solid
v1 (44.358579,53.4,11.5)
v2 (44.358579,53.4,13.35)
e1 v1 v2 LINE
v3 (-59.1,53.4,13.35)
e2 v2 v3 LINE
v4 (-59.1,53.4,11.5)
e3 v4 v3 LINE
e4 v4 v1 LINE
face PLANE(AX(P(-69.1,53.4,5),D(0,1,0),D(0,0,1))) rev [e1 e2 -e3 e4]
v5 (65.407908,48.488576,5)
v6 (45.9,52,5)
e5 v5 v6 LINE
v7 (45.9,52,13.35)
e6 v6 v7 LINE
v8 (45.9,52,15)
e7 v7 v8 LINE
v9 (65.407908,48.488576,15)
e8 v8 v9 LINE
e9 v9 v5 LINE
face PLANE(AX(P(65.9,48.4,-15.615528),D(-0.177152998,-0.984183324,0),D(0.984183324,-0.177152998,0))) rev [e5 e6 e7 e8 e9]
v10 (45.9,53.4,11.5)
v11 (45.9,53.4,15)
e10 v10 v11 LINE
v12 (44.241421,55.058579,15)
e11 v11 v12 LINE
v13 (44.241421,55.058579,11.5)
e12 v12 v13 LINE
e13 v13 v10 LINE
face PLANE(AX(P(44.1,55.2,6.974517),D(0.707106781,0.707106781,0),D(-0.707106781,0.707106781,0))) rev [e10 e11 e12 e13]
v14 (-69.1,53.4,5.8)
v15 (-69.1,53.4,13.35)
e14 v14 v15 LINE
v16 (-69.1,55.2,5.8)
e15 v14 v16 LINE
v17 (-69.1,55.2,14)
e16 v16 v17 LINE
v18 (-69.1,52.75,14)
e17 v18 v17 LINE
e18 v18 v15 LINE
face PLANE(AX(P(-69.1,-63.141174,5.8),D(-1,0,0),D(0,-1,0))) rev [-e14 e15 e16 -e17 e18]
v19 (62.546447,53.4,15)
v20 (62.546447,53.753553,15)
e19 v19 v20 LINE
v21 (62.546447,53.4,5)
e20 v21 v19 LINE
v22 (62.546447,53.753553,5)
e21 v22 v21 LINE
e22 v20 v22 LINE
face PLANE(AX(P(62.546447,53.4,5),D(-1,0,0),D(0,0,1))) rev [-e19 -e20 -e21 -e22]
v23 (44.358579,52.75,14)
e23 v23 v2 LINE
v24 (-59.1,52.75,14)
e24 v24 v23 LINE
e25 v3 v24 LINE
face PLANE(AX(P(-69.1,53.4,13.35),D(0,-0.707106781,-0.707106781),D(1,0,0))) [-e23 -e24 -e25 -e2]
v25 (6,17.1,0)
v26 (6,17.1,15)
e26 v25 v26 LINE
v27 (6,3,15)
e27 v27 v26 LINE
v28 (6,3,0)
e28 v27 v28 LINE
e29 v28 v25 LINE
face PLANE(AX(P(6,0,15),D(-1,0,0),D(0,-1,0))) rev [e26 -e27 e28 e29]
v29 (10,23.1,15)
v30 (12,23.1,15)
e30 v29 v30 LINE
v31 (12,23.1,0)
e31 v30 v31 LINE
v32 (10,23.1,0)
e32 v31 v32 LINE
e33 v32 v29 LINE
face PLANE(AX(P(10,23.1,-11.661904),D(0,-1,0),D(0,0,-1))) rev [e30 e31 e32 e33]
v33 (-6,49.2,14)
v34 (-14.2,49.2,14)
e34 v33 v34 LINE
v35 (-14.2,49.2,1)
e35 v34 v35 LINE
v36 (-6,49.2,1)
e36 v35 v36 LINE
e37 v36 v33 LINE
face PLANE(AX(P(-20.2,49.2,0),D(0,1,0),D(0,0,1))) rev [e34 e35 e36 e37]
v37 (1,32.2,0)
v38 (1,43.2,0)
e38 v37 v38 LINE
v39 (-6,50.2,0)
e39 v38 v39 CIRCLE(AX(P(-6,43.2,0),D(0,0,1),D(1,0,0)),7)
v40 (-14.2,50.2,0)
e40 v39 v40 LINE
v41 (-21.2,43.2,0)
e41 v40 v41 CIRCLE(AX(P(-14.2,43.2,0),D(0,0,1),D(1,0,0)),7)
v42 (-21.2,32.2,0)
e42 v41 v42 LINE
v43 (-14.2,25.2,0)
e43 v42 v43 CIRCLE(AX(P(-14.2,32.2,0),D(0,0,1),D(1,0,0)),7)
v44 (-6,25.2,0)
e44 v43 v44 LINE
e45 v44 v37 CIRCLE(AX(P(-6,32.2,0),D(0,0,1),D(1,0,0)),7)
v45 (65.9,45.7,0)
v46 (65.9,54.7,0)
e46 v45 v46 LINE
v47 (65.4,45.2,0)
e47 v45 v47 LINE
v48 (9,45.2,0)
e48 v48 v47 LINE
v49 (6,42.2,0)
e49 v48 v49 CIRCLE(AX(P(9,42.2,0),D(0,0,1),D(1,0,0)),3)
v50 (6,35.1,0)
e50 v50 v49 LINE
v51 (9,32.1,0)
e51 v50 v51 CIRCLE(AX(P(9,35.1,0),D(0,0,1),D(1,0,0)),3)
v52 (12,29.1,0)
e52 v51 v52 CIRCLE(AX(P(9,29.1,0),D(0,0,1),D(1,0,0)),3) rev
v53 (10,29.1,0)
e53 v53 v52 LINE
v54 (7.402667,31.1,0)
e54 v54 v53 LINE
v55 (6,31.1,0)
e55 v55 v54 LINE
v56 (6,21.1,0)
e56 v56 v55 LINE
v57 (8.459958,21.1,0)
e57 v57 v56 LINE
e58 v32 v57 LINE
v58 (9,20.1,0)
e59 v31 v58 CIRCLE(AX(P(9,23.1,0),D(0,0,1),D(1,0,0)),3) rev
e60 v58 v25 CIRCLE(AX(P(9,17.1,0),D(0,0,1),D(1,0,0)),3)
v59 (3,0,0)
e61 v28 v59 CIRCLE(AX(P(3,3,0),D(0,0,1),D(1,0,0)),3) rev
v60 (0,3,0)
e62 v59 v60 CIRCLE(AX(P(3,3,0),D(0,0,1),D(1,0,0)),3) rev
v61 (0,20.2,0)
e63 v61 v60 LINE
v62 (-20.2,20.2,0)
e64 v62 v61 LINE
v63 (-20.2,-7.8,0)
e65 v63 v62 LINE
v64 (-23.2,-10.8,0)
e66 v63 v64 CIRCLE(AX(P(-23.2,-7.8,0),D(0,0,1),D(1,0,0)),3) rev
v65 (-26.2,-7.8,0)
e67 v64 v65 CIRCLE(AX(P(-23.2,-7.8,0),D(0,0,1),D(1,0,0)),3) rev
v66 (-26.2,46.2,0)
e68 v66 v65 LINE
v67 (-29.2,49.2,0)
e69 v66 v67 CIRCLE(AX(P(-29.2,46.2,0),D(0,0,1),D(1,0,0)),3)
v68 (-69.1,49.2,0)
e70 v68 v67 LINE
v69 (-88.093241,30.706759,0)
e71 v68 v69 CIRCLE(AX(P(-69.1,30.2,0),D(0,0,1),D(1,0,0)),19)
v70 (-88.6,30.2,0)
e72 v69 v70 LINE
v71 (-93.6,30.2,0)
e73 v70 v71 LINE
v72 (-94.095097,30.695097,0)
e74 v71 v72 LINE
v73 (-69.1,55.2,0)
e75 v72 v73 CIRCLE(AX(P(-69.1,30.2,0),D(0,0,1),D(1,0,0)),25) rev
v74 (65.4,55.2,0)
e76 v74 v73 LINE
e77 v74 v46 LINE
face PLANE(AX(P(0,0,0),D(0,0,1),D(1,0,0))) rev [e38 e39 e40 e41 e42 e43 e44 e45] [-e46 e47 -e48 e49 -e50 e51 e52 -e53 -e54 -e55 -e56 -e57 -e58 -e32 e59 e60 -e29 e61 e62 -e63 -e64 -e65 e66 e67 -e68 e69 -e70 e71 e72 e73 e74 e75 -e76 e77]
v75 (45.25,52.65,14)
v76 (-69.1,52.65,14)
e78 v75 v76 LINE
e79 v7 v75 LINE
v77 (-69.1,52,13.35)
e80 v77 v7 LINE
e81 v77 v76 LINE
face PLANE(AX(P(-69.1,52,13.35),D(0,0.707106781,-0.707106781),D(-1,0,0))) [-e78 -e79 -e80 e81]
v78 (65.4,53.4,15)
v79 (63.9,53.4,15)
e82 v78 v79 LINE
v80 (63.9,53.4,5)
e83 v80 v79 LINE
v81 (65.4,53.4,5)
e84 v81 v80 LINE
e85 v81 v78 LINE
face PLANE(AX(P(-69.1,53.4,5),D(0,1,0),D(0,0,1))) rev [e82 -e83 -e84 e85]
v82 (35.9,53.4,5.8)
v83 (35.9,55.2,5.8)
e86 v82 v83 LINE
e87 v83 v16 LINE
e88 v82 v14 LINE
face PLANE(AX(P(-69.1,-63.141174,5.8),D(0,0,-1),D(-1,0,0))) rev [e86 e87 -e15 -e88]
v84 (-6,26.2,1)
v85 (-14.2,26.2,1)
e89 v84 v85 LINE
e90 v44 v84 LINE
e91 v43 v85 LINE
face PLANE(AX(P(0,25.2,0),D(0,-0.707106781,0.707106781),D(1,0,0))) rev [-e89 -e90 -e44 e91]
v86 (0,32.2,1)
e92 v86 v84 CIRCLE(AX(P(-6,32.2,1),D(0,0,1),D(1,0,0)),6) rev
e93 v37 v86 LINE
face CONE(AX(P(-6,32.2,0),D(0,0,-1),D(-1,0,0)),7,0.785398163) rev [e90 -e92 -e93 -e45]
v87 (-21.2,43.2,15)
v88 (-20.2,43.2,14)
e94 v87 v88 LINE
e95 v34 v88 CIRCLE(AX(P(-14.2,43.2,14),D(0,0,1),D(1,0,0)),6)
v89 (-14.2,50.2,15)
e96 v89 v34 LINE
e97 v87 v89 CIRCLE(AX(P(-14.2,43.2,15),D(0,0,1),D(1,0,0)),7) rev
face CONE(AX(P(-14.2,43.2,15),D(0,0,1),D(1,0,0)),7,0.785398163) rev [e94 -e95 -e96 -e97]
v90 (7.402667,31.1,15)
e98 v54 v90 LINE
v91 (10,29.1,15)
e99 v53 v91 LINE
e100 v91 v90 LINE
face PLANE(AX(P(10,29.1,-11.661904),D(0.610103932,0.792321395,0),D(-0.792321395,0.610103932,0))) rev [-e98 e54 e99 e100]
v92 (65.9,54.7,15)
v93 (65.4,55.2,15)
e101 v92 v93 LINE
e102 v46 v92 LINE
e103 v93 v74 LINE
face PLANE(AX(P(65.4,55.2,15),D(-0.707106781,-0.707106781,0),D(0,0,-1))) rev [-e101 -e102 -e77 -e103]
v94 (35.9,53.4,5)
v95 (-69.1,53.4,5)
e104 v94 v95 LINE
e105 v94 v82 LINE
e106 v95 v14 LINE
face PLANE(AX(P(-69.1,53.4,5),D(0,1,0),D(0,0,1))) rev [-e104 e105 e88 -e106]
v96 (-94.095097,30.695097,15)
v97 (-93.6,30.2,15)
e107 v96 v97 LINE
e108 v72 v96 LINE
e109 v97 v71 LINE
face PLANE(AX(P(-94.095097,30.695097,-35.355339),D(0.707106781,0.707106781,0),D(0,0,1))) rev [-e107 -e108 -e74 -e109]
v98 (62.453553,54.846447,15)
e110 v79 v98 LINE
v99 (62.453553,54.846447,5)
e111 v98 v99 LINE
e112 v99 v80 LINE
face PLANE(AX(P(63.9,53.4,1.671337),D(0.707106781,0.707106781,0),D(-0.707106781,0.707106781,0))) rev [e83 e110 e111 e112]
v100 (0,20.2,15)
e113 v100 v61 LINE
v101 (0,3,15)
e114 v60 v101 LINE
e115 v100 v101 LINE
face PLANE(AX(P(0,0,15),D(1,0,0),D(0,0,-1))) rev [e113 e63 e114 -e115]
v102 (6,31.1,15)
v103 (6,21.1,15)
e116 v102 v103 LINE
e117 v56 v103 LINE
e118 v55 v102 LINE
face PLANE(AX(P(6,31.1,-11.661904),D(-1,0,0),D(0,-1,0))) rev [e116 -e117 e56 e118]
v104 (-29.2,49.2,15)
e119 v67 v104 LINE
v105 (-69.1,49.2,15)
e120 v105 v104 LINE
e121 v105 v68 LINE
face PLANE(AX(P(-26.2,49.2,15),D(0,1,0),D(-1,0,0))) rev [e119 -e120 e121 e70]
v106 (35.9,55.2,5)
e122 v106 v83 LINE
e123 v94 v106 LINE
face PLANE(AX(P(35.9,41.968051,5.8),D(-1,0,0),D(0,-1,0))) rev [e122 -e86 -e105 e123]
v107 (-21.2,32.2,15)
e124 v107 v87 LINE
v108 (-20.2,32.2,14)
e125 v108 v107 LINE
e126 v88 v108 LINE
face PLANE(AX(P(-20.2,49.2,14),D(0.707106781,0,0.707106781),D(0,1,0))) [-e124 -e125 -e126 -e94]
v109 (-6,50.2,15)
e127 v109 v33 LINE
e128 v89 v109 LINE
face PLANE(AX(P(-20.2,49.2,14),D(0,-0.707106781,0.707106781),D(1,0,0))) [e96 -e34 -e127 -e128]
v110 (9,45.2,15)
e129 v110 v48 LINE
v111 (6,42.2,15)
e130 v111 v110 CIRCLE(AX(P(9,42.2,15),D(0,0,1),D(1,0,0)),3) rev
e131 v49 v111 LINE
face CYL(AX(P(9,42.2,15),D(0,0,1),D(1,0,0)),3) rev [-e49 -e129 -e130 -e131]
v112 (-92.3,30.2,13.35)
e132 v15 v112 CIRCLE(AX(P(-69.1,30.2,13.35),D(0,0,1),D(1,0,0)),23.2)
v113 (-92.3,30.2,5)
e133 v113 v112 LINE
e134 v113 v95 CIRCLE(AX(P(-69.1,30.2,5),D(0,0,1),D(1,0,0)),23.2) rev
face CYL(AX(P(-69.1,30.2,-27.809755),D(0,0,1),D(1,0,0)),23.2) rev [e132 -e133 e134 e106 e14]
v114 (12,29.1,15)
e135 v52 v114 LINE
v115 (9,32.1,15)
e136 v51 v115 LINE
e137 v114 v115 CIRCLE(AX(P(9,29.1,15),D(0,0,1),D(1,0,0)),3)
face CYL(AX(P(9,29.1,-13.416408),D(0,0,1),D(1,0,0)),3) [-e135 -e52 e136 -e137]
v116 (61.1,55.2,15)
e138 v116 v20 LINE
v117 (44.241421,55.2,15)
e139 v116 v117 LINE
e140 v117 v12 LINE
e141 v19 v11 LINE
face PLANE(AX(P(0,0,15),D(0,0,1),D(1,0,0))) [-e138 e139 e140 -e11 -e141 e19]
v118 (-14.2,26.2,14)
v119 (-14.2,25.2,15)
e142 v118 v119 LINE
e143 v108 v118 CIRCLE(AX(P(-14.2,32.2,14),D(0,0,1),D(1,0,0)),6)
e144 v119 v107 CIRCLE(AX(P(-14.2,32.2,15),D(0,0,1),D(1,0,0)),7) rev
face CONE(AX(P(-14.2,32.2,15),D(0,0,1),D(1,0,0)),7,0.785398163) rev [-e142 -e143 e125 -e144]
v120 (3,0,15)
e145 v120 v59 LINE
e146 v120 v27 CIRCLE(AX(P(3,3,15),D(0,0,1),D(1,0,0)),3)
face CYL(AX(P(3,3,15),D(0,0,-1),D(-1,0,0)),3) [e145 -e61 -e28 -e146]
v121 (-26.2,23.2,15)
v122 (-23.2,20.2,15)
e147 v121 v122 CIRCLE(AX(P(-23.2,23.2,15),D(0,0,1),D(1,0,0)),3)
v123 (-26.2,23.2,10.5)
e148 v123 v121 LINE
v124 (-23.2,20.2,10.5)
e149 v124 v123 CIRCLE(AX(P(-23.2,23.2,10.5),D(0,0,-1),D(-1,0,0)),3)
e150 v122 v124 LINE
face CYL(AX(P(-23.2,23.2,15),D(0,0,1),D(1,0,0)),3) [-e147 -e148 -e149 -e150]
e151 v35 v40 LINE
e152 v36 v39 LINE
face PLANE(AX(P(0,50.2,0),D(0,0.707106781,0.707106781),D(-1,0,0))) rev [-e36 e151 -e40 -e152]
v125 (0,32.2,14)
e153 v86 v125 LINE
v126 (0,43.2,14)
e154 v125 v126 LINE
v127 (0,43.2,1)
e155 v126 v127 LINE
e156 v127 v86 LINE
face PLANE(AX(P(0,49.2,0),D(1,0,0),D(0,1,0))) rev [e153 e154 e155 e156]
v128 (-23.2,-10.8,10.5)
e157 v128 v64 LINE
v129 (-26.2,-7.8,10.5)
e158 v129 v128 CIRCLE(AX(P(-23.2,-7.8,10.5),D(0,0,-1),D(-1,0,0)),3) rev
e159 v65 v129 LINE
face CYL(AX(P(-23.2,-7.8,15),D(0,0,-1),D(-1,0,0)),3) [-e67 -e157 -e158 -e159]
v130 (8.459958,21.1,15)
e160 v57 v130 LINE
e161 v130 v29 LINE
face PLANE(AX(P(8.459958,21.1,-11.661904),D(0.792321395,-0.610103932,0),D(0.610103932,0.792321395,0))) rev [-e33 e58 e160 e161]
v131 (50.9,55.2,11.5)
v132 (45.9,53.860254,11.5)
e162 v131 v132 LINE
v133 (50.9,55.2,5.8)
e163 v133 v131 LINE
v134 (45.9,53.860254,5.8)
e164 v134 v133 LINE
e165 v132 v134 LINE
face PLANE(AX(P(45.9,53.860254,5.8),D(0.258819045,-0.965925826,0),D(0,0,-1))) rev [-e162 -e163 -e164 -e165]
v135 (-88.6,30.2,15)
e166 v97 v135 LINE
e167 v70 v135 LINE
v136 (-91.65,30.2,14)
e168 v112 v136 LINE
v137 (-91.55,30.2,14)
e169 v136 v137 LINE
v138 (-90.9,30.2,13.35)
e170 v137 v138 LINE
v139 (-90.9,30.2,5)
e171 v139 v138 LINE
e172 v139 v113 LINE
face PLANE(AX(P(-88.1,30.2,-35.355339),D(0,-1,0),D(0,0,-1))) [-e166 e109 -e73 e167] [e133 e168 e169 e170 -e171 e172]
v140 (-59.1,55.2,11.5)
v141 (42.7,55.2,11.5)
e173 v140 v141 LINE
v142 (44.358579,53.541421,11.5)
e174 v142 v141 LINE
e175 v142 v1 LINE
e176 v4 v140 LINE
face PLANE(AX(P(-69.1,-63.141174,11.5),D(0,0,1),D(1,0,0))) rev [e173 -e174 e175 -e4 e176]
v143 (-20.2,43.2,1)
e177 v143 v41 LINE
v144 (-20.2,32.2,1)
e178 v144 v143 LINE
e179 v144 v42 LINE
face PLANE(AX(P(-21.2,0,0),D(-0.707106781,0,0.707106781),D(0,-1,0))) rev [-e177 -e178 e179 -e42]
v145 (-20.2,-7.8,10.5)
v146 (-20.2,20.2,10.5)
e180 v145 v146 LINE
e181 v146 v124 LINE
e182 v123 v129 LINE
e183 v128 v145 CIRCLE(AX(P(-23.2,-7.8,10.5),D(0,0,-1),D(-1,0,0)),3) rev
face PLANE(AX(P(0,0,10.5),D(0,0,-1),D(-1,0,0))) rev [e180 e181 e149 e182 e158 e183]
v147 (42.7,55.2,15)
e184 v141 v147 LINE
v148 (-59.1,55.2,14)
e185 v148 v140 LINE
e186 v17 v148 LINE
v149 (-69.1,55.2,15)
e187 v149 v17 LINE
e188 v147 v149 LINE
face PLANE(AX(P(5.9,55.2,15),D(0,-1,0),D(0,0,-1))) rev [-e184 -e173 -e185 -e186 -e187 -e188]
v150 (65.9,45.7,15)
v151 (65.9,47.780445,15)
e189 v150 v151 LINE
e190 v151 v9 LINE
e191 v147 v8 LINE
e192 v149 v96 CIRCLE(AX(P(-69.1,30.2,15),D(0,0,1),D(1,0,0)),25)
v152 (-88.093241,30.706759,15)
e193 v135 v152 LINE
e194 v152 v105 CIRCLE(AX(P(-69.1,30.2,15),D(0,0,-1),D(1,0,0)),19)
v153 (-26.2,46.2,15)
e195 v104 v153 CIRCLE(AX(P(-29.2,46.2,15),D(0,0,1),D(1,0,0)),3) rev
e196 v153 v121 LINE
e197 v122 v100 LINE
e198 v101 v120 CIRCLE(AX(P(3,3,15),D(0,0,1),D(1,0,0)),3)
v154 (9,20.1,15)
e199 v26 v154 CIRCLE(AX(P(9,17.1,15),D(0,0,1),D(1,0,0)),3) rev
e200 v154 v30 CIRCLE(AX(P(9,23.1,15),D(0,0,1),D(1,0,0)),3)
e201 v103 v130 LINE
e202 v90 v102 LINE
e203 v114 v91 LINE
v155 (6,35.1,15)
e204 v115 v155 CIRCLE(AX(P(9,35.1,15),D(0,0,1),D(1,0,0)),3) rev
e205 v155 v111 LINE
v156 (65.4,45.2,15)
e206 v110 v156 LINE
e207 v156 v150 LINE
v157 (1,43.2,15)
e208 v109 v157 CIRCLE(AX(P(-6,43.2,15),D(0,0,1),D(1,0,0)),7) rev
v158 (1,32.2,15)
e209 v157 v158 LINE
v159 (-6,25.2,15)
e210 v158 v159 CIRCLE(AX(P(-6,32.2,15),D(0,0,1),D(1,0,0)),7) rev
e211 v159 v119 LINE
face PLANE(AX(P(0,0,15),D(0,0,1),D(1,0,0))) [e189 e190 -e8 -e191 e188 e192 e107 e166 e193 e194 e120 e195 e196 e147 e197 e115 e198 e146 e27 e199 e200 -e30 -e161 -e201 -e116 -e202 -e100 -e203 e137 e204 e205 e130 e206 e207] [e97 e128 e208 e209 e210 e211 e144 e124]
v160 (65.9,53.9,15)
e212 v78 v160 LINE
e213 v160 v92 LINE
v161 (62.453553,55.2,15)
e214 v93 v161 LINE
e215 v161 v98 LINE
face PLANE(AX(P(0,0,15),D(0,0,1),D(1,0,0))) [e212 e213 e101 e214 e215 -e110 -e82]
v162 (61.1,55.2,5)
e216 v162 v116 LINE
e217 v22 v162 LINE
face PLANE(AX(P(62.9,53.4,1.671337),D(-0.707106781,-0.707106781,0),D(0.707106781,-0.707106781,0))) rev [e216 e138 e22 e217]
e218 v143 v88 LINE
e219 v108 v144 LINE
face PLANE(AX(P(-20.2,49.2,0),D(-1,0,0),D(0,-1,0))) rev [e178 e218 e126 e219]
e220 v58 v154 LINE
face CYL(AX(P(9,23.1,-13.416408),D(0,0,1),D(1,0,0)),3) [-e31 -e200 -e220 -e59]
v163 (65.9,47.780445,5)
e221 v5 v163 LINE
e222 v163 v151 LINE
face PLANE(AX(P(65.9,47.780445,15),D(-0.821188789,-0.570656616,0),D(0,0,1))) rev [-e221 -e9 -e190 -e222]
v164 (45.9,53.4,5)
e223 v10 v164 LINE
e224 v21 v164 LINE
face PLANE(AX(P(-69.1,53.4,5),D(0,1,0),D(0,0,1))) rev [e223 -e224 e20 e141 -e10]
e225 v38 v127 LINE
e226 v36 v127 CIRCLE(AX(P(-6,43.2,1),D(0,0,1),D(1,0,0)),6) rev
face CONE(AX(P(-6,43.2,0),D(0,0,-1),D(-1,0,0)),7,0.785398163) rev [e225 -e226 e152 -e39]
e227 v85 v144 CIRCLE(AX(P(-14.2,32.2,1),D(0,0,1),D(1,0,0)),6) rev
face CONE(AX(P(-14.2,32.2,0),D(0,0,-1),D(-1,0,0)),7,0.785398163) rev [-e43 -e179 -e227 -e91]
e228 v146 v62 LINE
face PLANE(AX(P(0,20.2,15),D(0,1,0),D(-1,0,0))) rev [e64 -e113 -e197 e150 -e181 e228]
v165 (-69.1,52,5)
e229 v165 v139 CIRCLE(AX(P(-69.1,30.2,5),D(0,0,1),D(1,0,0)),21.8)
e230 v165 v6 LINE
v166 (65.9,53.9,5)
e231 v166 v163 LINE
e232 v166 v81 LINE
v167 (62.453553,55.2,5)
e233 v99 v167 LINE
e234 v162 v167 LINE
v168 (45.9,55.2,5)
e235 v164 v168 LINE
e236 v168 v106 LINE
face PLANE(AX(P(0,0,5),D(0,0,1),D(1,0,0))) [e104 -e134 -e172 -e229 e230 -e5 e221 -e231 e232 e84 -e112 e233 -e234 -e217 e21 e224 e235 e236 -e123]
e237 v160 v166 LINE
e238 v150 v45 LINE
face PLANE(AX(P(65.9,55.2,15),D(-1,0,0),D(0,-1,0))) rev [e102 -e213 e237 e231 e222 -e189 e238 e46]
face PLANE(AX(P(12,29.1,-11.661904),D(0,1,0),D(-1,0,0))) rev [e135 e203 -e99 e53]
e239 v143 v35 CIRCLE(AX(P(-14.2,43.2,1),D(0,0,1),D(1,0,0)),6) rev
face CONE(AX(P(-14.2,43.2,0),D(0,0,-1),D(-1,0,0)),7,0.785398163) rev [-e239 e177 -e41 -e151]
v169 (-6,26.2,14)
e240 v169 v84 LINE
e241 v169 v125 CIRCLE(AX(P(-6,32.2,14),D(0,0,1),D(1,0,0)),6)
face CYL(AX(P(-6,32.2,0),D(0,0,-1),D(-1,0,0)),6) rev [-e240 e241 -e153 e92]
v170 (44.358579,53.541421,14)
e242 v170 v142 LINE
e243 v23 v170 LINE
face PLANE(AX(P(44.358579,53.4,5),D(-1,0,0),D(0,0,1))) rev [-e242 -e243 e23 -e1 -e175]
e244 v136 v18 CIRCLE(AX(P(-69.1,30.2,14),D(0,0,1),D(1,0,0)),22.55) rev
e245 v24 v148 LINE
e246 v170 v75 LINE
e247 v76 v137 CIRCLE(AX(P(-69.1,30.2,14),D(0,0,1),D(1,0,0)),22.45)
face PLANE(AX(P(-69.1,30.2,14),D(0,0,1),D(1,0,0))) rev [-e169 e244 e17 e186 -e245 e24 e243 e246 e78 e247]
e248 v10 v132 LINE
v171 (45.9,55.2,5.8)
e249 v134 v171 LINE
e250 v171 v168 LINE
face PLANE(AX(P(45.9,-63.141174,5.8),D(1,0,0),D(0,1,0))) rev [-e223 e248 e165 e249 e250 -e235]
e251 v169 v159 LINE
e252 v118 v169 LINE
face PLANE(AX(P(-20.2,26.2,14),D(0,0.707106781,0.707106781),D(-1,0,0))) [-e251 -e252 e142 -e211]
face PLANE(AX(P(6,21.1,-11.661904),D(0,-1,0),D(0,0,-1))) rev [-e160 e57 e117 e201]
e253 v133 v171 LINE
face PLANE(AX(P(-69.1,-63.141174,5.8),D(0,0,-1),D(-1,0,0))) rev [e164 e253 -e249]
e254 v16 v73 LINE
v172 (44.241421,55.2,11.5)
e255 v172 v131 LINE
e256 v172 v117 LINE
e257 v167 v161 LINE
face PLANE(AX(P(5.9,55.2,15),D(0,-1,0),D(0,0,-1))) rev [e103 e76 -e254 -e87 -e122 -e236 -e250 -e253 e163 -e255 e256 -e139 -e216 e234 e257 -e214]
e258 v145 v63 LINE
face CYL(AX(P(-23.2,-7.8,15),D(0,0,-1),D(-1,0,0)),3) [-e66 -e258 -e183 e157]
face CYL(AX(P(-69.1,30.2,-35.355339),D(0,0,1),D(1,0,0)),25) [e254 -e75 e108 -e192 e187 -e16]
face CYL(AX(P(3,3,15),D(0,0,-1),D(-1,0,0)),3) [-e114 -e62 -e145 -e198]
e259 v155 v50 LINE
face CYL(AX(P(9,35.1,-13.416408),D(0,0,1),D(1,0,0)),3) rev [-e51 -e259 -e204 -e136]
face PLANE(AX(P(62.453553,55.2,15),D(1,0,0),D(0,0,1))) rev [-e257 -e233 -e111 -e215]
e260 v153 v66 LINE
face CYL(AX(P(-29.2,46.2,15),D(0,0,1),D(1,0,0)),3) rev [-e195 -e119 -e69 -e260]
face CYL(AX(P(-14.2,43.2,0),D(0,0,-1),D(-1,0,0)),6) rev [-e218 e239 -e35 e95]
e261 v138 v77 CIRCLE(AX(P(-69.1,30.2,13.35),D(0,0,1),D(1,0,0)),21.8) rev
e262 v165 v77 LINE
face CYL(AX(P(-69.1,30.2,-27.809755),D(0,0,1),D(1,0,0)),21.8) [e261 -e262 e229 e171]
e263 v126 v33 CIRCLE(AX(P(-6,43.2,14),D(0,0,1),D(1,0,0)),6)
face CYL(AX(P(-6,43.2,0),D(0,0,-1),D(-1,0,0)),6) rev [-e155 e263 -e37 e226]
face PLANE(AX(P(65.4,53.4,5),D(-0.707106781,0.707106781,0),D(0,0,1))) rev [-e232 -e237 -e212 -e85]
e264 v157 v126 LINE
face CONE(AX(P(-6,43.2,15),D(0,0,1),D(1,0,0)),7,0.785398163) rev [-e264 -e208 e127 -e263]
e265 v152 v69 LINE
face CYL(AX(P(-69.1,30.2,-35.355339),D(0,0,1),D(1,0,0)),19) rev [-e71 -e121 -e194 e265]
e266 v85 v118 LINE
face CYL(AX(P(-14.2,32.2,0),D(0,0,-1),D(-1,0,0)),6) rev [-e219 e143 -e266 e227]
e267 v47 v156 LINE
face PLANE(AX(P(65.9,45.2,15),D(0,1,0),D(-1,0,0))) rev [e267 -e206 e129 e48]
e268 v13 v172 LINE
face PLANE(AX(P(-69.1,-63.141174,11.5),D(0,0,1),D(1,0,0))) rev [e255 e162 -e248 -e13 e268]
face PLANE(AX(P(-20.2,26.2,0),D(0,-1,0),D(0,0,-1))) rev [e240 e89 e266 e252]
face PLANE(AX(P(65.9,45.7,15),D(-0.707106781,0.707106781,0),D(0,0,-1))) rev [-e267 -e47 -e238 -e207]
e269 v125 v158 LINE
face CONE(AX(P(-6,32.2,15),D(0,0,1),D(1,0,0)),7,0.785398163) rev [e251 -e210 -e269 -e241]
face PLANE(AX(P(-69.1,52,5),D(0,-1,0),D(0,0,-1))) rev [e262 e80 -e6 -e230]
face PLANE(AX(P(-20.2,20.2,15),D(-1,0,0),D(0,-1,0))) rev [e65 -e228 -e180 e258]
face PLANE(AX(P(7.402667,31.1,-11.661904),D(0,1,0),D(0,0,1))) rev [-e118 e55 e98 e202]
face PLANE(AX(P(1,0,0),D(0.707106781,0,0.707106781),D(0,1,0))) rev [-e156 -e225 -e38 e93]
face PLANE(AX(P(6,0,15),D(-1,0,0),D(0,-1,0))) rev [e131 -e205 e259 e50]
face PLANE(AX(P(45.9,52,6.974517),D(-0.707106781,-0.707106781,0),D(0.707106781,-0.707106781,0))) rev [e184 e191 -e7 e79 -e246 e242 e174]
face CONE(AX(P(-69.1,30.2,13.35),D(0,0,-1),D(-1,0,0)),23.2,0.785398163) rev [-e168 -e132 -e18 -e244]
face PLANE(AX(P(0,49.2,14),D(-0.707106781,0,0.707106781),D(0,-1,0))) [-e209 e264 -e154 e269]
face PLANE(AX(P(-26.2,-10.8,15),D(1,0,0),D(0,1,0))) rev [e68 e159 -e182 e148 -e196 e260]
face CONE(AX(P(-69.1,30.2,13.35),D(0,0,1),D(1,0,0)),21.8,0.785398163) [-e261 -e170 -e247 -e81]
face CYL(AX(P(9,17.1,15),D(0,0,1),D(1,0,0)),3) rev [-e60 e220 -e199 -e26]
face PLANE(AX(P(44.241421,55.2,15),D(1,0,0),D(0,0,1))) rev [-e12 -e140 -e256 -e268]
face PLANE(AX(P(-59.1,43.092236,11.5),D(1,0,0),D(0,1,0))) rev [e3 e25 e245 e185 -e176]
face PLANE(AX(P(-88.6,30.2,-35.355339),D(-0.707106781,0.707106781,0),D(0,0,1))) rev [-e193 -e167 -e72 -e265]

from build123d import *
from OCP.BRepFilletAPI import BRepFilletAPI_MakeChamfer

# Parameters (mm, degrees)
BOSS_EXTRUDE1_DEPTH = 15
BOSS_EXTRUDE2_DEPTH = 15
SKETCH6_W           = 115
SKETCH6_H           = 1.4
CUT_EXTRUDE2_DEPTH  = 10
CUT_EXTRUDE3_DEPTH  = 10
CUT_EXTRUDE4_DEPTH  = 10
BOSS_EXTRUDE3_DEPTH = 1
CUT_EXTRUDE5_REACH  = 117.913
SKETCH10_W          = 115
SKETCH10_H          = 5.7
SKETCH13_W          = 20.2
SKETCH13_H          = 23
CUT_EXTRUDE6_DEPTH  = 111.121977825
FILLET1_R           = 6
SKETCH14_W          = 6
SKETCH14_H          = 31
CUT_EXTRUDE7_DEPTH  = 4.5
FILLET2_R           = 3
SKETCH16_W          = 10
SKETCH16_H          = 2.5
CUT_EXTRUDE8_DEPTH  = 1.8
CHAMFER1_SIZE       = 0.5
CHAMFER1_SIZE_2     = 0.619555405
CHAMFER2_SIZE       = 1
CHAMFER3_SIZE       = 5
CHAMFER3_SIZE2      = 1.339745962
CUT_EXTRUDE12_REACH = 112.118
CHAMFER4_SIZE       = 0.2
CHAMFER4_SIZE_2     = 0.141421356
SKETCH25_W          = 6
SKETCH25_H          = 12
BOSS_EXTRUDE6_DEPTH = 15
FILLET4_START       = -1
FILLET4_DEPTH       = 16
FILLET4_2_DEPTH     = 15
CUT_EXTRUDE15_DEPTH = 15
CUT_EXTRUDE16_DEPTH = 10
CHAMFER5_SIZE       = 0.5
CHAMFER5_SIZE2      = 0.353553391
CHAMFER6_SIZE       = 0.65
SKETCH29_W          = 10
SKETCH29_H          = 0.8
CUT_EXTRUDE17_DEPTH = 3.2


with BuildPart() as part:
    # Sketch3 → Boss-Extrude1 (new body)
    with BuildSketch(Plane.XY):
        Polygon((0, 0), (0, 20.2), (-20.2, 20.2), (-20.2, -10.8), (-26.2, -10.8), (-26.2, 49.2), (-69.1, 49.2), (-69.1, 55.2), (5.9, 55.2), (65.9, 55.2), (65.9, 45.2), (6, 45.2), (6, 0), align=None)
    extrude(amount=BOSS_EXTRUDE1_DEPTH)

    # Sketch4 → Boss-Extrude2 (add)
    with BuildSketch(Plane.XY.offset(15)):
        with BuildLine():
            Line((-88.1, 30.2), (-94.1, 30.2))
            ThreePointArc((-94.1, 30.2), (-86.77766953, 47.87766953), (-69.1, 55.2))
            Line((-69.1, 55.2), (-69.1, 49.2))
            ThreePointArc((-69.1, 49.2), (-82.535028843, 43.635028843), (-88.1, 30.2))
        make_face()
    extrude(amount=-BOSS_EXTRUDE2_DEPTH)

    # Sketch6 → Cut-Extrude2 (cut)
    with BuildSketch(Plane.XY.offset(15)):
        with Locations((-11.6, 52.7)):
            Rectangle(SKETCH6_W, SKETCH6_H)
    extrude(amount=-CUT_EXTRUDE2_DEPTH, mode=Mode.SUBTRACT)

    # Sketch7 → Cut-Extrude3 (cut)
    with BuildSketch(Plane.XY.offset(15)):
        with BuildLine():
            Line((-92.3, 30.2), (-90.9, 30.2))
            ThreePointArc((-90.9, 30.2), (-84.51492783, 45.61492783), (-69.1, 52))
            Line((-69.1, 52), (-69.1, 53.4))
            ThreePointArc((-69.1, 53.4), (-85.504877324, 46.604877324), (-92.3, 30.2))
        make_face()
    extrude(amount=-CUT_EXTRUDE3_DEPTH, mode=Mode.SUBTRACT)

    # Sketch8 → Cut-Extrude4 (cut)
    with BuildSketch(Plane.XY.offset(15)):
        Polygon((45.9, 53.4), (65.9, 53.4), (65.9, 48.4), (45.9, 52), align=None)
    extrude(amount=-CUT_EXTRUDE4_DEPTH, mode=Mode.SUBTRACT)

    # Sketch9 → Boss-Extrude3 (add)
    with BuildSketch(Plane.XY.offset(15)):
        with BuildLine():
            Line((-69.1, 52), (45.9, 52))
            Line((45.9, 52), (45.9, 53.4))
            Line((45.9, 53.4), (-69.1, 53.4))
            ThreePointArc((-69.1, 53.4), (-85.504877324, 46.604877324), (-92.3, 30.2))
            Line((-92.3, 30.2), (-90.9, 30.2))
            ThreePointArc((-90.9, 30.2), (-84.51492783, 45.61492783), (-69.1, 52))
        make_face()
    extrude(amount=-BOSS_EXTRUDE3_DEPTH)

    # Cut-Extrude5: up to this face of the body (flat: up to its plane)
    cut_extrude5_end = Plane(part.part.faces().sort_by_distance((-11.6, 52, 9.5))[0])
    # Sketch10 → Cut-Extrude5 (cut, up to the picked face)
    with BuildSketch(Plane(origin=(0, 55.2, 0), x_dir=(-1, 0, 0), z_dir=(0, 1, 0)), mode=Mode.PRIVATE) as cut_extrude5_sk1:
        with Locations((11.6, 8.65)):
            Rectangle(SKETCH10_W, SKETCH10_H)
    cut_extrude5_tool1 = split(extrude(cut_extrude5_sk1.sketch, amount=-CUT_EXTRUDE5_REACH, mode=Mode.PRIVATE), bisect_by=cut_extrude5_end, keep=Keep.BOTH, mode=Mode.PRIVATE)
    add(cut_extrude5_tool1.solids().sort_by(Axis((-11.6, 55.2, 8.65), (0, -1, 0)))[0], mode=Mode.SUBTRACT)

    # Sketch13 → Cut-Extrude6 (cut, through all)
    with BuildSketch(Plane.XY.offset(15)):
        with Locations((-10.1, 37.7)):
            Rectangle(SKETCH13_W, SKETCH13_H)
    extrude(amount=-CUT_EXTRUDE6_DEPTH, mode=Mode.SUBTRACT)

    # Fillet1
    fillet1_edges = [part.edges().sort_by_distance(p)[0] for p in [
        (-20.2, 26.2, 7.5),
        (-20.2, 49.2, 7.5),
        (0, 49.2, 7.5),
        (0, 26.2, 7.5),
    ]]
    fillet(fillet1_edges, radius=FILLET1_R)

    # Sketch14 → Cut-Extrude7 (cut)
    with BuildSketch(Plane.XY.offset(15)):
        with Locations((-23.2, 4.7)):
            Rectangle(SKETCH14_W, SKETCH14_H)
    extrude(amount=-CUT_EXTRUDE7_DEPTH, mode=Mode.SUBTRACT)

    # Fillet2
    fillet2_edges = [part.edges().sort_by_distance(p)[0] for p in [
        (-26.2, 49.2, 7.5),
        (6, 45.2, 7.5),
        (-26.2, 20.2, 12.75),
        (6, 0, 7.5),
        (0, 0, 7.5),
        (-20.2, -10.8, 5.25),
        (-26.2, -10.8, 5.25),
    ]]
    fillet(fillet2_edges, radius=FILLET2_R - 0.0001)  # a hair under: the kernel refuses the full size

    # Sketch16 → Cut-Extrude8 (cut)
    with BuildSketch(Plane(origin=(0, 55.2, 0), x_dir=(-1, 0, 0), z_dir=(0, 1, 0))):
        with Locations((64.1, 12.75)):
            Rectangle(SKETCH16_W, SKETCH16_H)
    extrude(amount=-CUT_EXTRUDE8_DEPTH, mode=Mode.SUBTRACT)

    # Chamfer1
    # the kernel refuses this chamfer: 0.619555405, 0.5 mm, written as the material it takes off along each edge
    with BuildSketch(Plane(origin=(65.9, 55.2, -1.285841494), x_dir=(-1, 0, 0), z_dir=(0, 0, 1)), Plane(origin=(65.9, 45.2, -1.285841494), x_dir=(0, 1, 0), z_dir=(0, 0, 1))) as chamfer1_piece_1:
        Polygon((CHAMFER1_SIZE, 0), (0, CHAMFER1_SIZE), (0, 0), align=None)
    extrude(amount=17.571682988, mode=Mode.SUBTRACT)
    with BuildSketch(Plane(origin=(-88.1, 30.2, 16.303301327), x_dir=(-1, 0, 0), z_dir=(0, 0, -1))) as chamfer1_piece_2:
        with BuildLine():
            Line((CHAMFER1_SIZE, 0), (-0.006759226, 0.506759226))
            ThreePointArc((-0.006759226, 0.506759226), (-0.001786833, 0.26056951), (0, 0))
            Line((0, 0), (CHAMFER1_SIZE, 0))
        make_face()
    extrude(amount=17.606602654, mode=Mode.SUBTRACT)
    with BuildSketch(Plane(origin=(-94.1, 30.2, 16.285841494), x_dir=(1, 0, 0), z_dir=(0, 0, -1))) as chamfer1_piece_3:
        with BuildLine():
            Line((CHAMFER1_SIZE, 0), (0.004902903, -0.495097097))
            ThreePointArc((0.004902903, -0.495097097), (0.001296043, -0.254559377), (0, 0))
            Line((0, 0), (CHAMFER1_SIZE, 0))
        make_face()
    extrude(amount=17.571682988, mode=Mode.SUBTRACT)
    with BuildSketch(Plane(origin=(65.9, 53.4, 16.285841494), x_dir=(-1, 0, 0), z_dir=(0, 0, -1))) as chamfer1_piece_4:
        Polygon((CHAMFER1_SIZE, 0), (0, CHAMFER1_SIZE), (0, 0), align=None)
    extrude(amount=11.285841494, mode=Mode.SUBTRACT)
    with BuildSketch(Plane(origin=(65.9, 48.4, 16.600156341), x_dir=(-0.9841833239736955, 0.17715299831526463, 0), z_dir=(0, 0, -1))) as chamfer1_piece_5:
        Polygon((CHAMFER1_SIZE, 0), (-CHAMFER1_SIZE_2 * 0.177152998223, -CHAMFER1_SIZE_2 * 0.984183323461), (0, 0), align=None)
    extrude(amount=11.600156341, mode=Mode.SUBTRACT)

    # Chamfer2
    chamfer2_edges = [part.edges().sort_by_distance(p)[0] for p in [
        (-10.1, 49.2, 15),
        (-10.1, 49.2, 0),
        (0, 37.7, 15),
        (0, 37.7, 0),
        (-10.1, 26.2, 15),
        (-10.1, 26.2, 0),
        (-20.2, 37.7, 15),
        (-20.2, 37.7, 0),
        (-1.757359313, 47.442640687, 15),
        (-1.757359313, 47.442640687, 0),
        (-1.757359313, 27.957359313, 15),
        (-1.757359313, 27.957359313, 0),
        (-18.442640687, 27.957359313, 15),
        (-18.442640687, 27.957359313, 0),
        (-18.442640687, 47.442640687, 15),
        (-18.442640687, 47.442640687, 0),
    ]]
    chamfer(chamfer2_edges, length=CHAMFER2_SIZE)

    # Chamfer3
    chamfer3_edges = [part.edges().sort_by_distance(p)[0] for p in [
        (45.9, 55.2, 8.65),
    ]]
    chamfer3_side = [part.faces().sort_by_distance(p)[0] for p in [
        (64.046661535, 55.2, 7.5),
    ]]
    chamfer(chamfer3_edges, length=CHAMFER3_SIZE, length2=CHAMFER3_SIZE2, reference=chamfer3_side[0])

    # Cut-Extrude12: up to this face of the body (flat: up to its plane)
    cut_extrude12_end = Plane(part.part.faces().sort_by_distance((-5.656799941, 54.307895333, 11.5))[0])
    # Sketch20 → Cut-Extrude12 (cut, up to the picked face)
    with BuildSketch(Plane.XY.offset(15), mode=Mode.PRIVATE) as cut_extrude12_sk1:
        Polygon((45.9, 52), (42.7, 55.2), (44.1, 55.2), (45.9, 53.4), align=None)
    cut_extrude12_tool1 = split(extrude(cut_extrude12_sk1.sketch, amount=-CUT_EXTRUDE12_REACH, mode=Mode.PRIVATE), bisect_by=cut_extrude12_end, keep=Keep.BOTH, mode=Mode.PRIVATE)
    add(cut_extrude12_tool1.solids().sort_by(Axis((44.617333, 53.917333, 15), (0, 0, -1)))[0], mode=Mode.SUBTRACT)

    # Chamfer4
    # the kernel refuses this chamfer: 0.2, 0.141421356 mm, written as the material it takes off along each edge
    with BuildSketch(Plane(origin=(44.5, 53.4, 10.985663402), x_dir=(-0.7071067811865476, 0.7071067811865476, 0), z_dir=(0, 0, 1))) as chamfer4_piece_1:
        Polygon((CHAMFER4_SIZE, 0), (CHAMFER4_SIZE_2 * 0.707106782373, CHAMFER4_SIZE_2 * 0.707106782373), (0, 0), align=None)
    extrude(amount=3.014336598, mode=Mode.SUBTRACT)
    with BuildSketch(Plane(origin=(44.1, 55.2, 15.514336598), x_dir=(1, 0, 0), z_dir=(0, 0, -1))) as chamfer4_piece_2:
        Polygon((CHAMFER4_SIZE_2 * 1.00000000168, 0), (CHAMFER4_SIZE * 0.707106781187, CHAMFER4_SIZE * 0.707106781186), (0, 0), align=None)
    extrude(amount=4.528673195, mode=Mode.SUBTRACT)

    # Sketch25 → Boss-Extrude6 (add)
    with BuildSketch(Plane.XY.offset(15)):
        with Locations((9, 26.1)):
            Rectangle(SKETCH25_W, SKETCH25_H)
    extrude(amount=-BOSS_EXTRUDE6_DEPTH)

    # Fillet4: read off the stored shape, not the designer's step
    # Fillet4 outline → Fillet4 (cut)
    with BuildSketch(Plane.XY.offset(FILLET4_START)):
        with BuildLine():
            ThreePointArc((9, 32.1), (11.121320344, 31.221320344), (12, 29.1))
            Line((12, 29.1), (12, 32.1))
            Line((12, 32.1), (9, 32.1))
        make_face()
        with BuildLine():
            ThreePointArc((12, 23.1), (11.121320344, 20.978679656), (9, 20.1))
            Line((9, 20.1), (12, 20.1))
            Line((12, 20.1), (12, 23.1))
        make_face()
    extrude(amount=FILLET4_DEPTH, mode=Mode.SUBTRACT)

    # Fillet4 2 outline → Fillet4 2 (add)
    with BuildSketch(Plane.XY):
        with BuildLine():
            Line((6, 32.1), (9, 32.1))
            ThreePointArc((9, 32.1), (6.878679656, 32.978679656), (6, 35.1))
            Line((6, 35.1), (6, 32.1))
        make_face()
        with BuildLine():
            ThreePointArc((6, 17.1), (6.878679656, 19.221320344), (9, 20.1))
            Line((9, 20.1), (6, 20.1))
            Line((6, 20.1), (6, 17.1))
        make_face()
    extrude(amount=FILLET4_2_DEPTH)

    # Sketch26 → Cut-Extrude15 (cut)
    with BuildSketch(Plane.XY.offset(15)):
        Polygon((12, 29.1), (10, 29.1), (7.402667467, 31.1), (6, 31.1), (6, 21.1), (8.459958458, 21.1), (10, 23.1), (12, 23.1), align=None)
    extrude(amount=-CUT_EXTRUDE15_DEPTH, mode=Mode.SUBTRACT)

    # Sketch27 → Cut-Extrude16 (cut)
    with BuildSketch(Plane.XY.offset(15)):
        Polygon((62.9, 53.4), (61.1, 55.2), (62.1, 55.2), (63.9, 53.4), align=None)
    extrude(amount=-CUT_EXTRUDE16_DEPTH, mode=Mode.SUBTRACT)

    # Chamfer5: one chamfer whose edges measure the first distance from different faces: ONE call of the kernel's chamfer builder (chamfer() names one face for all edges)
    chamfer5_edges_1 = [part.edges().sort_by_distance(p)[0] for p in [
        (62.9, 53.4, 10),
    ]]
    chamfer5_side_1 = [part.faces().sort_by_distance(p)[0] for p in [
        (62, 54.3, 10),
    ]]
    chamfer5_edges_2 = [part.edges().sort_by_distance(p)[0] for p in [
        (62.1, 55.2, 10),
    ]]
    chamfer5_side_2 = [part.faces().sort_by_distance(p)[0] for p in [
        (63, 54.3, 10),
    ]]
    chamfer5 = BRepFilletAPI_MakeChamfer(part.part.solid().wrapped)
    for e in chamfer5_edges_1:
        chamfer5.Add(CHAMFER5_SIZE, CHAMFER5_SIZE2, e.wrapped, chamfer5_side_1[0].wrapped)  # the first distance lies on this face
    for e in chamfer5_edges_2:
        chamfer5.Add(CHAMFER5_SIZE, CHAMFER5_SIZE2, e.wrapped, chamfer5_side_2[0].wrapped)  # the first distance lies on this face
    add(Compound.cast(chamfer5.Shape()), mode=Mode.REPLACE)

    # Chamfer6
    chamfer6_edges = [part.edges().sort_by_distance(p)[0] for p in [
        (-84.51492783, 45.61492783, 14),
        (-85.504877324, 46.604877324, 14),
        (-11.6, 52, 14),
        (-7.370710678, 53.4, 14),
    ]]
    chamfer(chamfer6_edges, length=CHAMFER6_SIZE)

    # Sketch29 → Cut-Extrude17 (cut)
    with BuildSketch(Plane(origin=(0, 55.2, 0), x_dir=(-1, 0, 0), z_dir=(0, 1, 0))):
        with Locations((-40.9, 5.4)):
            Rectangle(SKETCH29_W, SKETCH29_H)
    extrude(amount=-CUT_EXTRUDE17_DEPTH, mode=Mode.SUBTRACT)


solid = part.part
